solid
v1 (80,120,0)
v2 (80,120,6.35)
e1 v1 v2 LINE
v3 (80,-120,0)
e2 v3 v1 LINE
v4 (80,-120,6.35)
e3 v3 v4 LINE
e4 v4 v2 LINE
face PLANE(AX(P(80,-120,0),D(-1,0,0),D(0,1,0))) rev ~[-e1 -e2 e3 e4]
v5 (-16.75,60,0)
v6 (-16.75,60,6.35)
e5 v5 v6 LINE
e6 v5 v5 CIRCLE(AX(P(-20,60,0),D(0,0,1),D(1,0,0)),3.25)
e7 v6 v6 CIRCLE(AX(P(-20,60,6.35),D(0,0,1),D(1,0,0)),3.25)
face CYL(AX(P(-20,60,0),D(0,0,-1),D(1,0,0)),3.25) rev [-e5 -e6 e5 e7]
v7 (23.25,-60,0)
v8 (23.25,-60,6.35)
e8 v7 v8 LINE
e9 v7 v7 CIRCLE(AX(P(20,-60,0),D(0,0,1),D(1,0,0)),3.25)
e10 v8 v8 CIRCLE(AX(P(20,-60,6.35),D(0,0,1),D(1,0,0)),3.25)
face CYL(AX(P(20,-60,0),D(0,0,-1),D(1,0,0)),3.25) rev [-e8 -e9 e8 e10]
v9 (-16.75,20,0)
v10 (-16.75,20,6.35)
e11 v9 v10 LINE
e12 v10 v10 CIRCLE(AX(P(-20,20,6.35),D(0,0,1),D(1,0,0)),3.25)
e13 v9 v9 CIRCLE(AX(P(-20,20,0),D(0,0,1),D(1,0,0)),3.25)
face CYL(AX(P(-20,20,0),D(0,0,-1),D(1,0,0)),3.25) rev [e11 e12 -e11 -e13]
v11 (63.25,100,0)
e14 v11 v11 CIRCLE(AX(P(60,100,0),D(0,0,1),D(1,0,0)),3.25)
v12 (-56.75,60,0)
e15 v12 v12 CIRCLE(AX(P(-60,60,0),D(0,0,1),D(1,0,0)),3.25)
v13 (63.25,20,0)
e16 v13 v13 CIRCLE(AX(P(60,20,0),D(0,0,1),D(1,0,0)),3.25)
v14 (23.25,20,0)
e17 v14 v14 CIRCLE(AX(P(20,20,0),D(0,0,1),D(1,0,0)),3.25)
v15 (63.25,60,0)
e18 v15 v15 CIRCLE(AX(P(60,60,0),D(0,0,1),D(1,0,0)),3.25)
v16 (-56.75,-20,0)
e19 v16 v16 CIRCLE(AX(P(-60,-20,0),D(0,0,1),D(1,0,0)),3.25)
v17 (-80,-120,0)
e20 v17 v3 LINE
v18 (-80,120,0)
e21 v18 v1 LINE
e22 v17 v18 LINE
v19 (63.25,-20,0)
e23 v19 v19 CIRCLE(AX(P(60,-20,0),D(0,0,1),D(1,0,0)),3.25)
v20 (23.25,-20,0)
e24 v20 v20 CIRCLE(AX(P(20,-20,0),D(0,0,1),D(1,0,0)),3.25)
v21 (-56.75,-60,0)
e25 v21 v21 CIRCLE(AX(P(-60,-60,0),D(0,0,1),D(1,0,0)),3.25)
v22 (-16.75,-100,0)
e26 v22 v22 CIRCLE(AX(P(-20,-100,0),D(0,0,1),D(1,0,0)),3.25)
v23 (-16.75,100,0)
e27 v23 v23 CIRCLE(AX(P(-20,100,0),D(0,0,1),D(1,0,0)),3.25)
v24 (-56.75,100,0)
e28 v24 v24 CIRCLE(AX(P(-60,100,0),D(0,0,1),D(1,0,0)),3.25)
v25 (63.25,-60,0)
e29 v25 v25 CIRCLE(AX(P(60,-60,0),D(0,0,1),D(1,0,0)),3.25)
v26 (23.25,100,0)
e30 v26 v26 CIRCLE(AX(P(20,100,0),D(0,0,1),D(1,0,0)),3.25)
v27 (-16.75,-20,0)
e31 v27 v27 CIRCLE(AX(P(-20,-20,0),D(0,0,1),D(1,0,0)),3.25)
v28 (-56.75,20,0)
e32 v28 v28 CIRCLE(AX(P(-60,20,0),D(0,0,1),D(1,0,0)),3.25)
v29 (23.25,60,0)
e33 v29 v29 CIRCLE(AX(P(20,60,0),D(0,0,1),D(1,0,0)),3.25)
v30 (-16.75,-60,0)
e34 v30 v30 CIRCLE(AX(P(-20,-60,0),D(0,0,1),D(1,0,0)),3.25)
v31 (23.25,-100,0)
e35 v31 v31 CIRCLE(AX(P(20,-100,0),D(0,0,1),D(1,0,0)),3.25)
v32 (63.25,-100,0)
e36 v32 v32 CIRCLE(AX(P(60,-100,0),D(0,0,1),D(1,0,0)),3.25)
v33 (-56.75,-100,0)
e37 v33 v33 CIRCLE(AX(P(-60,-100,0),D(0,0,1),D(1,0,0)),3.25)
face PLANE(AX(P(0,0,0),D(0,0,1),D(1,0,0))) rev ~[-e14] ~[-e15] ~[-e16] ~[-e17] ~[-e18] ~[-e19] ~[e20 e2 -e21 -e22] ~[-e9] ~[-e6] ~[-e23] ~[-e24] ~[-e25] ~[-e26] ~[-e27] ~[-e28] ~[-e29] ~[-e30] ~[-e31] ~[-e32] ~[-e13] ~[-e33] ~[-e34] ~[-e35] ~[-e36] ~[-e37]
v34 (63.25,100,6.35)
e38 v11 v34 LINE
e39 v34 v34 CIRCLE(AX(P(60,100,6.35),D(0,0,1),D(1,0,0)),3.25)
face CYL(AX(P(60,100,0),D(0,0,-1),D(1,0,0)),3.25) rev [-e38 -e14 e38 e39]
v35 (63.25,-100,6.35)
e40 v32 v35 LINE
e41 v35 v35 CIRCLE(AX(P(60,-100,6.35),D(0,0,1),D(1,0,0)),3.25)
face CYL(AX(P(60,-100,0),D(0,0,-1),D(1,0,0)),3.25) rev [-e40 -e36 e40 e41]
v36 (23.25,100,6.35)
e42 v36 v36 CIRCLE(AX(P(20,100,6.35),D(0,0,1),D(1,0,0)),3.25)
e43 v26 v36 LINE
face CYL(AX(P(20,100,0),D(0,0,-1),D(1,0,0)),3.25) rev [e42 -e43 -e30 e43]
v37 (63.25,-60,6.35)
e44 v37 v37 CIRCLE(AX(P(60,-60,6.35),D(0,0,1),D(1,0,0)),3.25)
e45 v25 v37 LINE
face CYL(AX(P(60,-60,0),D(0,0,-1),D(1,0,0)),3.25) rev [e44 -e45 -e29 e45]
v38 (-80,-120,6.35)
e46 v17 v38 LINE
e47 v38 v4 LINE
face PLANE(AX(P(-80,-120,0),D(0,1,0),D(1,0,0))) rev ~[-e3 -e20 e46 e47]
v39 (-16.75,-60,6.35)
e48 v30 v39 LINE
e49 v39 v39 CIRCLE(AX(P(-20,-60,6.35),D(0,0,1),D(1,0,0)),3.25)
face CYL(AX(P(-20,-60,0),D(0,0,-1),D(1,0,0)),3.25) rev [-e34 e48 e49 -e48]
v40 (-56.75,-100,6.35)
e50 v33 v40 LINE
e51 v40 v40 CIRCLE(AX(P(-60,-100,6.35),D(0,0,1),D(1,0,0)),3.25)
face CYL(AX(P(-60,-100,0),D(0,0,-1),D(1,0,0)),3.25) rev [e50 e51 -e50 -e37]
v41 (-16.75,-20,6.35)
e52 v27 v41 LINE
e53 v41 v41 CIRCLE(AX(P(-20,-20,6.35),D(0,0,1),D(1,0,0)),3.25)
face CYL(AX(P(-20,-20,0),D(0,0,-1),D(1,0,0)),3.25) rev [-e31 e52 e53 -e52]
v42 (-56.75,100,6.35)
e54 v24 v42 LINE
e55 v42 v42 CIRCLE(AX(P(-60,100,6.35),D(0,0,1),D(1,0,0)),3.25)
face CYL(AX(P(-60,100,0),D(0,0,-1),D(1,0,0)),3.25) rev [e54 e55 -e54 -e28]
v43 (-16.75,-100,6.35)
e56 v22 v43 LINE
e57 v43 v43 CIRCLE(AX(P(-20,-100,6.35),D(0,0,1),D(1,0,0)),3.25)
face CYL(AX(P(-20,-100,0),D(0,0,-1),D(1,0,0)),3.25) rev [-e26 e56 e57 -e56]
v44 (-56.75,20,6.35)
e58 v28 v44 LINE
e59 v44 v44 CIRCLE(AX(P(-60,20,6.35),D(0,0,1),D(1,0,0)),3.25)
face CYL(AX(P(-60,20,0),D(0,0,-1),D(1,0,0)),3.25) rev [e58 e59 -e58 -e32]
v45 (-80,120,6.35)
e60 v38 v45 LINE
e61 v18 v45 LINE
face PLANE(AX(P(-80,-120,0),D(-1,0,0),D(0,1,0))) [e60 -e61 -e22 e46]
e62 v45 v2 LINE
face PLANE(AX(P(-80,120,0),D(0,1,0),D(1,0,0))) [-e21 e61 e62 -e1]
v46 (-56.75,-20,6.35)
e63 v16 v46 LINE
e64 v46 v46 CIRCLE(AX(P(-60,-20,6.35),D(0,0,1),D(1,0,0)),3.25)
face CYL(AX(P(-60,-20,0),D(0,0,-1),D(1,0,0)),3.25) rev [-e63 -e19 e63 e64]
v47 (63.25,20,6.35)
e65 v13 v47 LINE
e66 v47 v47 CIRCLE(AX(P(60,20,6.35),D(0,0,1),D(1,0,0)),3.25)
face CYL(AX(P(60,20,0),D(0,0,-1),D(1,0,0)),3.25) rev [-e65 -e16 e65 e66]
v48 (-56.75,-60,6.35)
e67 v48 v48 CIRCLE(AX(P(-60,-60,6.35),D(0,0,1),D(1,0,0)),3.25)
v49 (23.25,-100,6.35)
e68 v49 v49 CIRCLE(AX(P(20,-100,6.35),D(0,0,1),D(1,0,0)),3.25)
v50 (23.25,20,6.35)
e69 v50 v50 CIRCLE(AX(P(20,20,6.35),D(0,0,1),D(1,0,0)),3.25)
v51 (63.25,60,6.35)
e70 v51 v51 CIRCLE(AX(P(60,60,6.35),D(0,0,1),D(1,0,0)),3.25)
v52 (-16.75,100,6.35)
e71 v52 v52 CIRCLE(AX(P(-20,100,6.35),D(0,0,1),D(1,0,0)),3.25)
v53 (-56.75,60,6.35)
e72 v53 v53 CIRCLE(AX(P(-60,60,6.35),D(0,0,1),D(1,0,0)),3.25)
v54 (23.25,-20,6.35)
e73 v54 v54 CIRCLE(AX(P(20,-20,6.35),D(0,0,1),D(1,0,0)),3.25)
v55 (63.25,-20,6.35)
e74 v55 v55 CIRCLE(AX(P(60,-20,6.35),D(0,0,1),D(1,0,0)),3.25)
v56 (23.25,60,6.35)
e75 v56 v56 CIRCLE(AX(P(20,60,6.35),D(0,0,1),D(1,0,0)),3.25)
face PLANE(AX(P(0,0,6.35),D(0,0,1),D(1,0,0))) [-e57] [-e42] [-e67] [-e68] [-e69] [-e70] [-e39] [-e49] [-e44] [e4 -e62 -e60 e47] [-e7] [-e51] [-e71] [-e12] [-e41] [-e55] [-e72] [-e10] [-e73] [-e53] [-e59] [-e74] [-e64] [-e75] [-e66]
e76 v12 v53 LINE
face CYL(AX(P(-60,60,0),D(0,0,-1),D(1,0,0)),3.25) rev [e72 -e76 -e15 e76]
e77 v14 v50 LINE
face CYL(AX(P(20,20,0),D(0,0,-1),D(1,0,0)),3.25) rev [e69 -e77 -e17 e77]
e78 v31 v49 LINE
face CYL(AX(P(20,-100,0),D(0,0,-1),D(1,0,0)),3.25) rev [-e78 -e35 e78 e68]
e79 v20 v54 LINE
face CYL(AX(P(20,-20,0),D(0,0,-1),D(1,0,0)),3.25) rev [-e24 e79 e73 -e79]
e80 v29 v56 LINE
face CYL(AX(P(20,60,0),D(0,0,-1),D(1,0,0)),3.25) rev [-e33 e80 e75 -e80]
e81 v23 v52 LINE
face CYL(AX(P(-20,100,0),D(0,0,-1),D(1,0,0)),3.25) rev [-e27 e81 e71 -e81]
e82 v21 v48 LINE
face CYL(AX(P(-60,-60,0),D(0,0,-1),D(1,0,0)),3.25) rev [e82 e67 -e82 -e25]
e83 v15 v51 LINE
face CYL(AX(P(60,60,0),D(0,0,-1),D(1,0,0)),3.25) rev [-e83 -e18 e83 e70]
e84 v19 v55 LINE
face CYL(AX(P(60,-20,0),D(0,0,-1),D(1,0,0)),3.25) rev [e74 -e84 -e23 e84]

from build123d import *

# Parameters (mm, degrees)
F0_W     = 160
F0_H     = 240
F0_R     = 3.25
F1_DEPTH = 6.35


# Not quite as in the source:
# - a length typed as a fraction of an inch, garbled in the dataset ("3 / 203.2 mm" for 3/8 in), is restored


with BuildPart() as f1:
    # F0 (on Top) → F1 (new body)
    with BuildSketch(Plane.XY):
        Rectangle(F0_W, F0_H)
        with Locations((-60, -100)):
            Circle(F0_R, mode=Mode.SUBTRACT)
        with Locations((-20, -100)):
            Circle(F0_R, mode=Mode.SUBTRACT)
        with Locations((-60, -60)):
            Circle(F0_R, mode=Mode.SUBTRACT)
        with Locations((-60, -20)):
            Circle(F0_R, mode=Mode.SUBTRACT)
        with Locations((-20, -60)):
            Circle(F0_R, mode=Mode.SUBTRACT)
        with Locations((-20, -20)):
            Circle(F0_R, mode=Mode.SUBTRACT)
        with Locations((20, -100)):
            Circle(F0_R, mode=Mode.SUBTRACT)
        with Locations((60, -100)):
            Circle(F0_R, mode=Mode.SUBTRACT)
        with Locations((20, -60)):
            Circle(F0_R, mode=Mode.SUBTRACT)
        with Locations((20, -20)):
            Circle(F0_R, mode=Mode.SUBTRACT)
        with Locations((60, -60)):
            Circle(F0_R, mode=Mode.SUBTRACT)
        with Locations((60, -20)):
            Circle(F0_R, mode=Mode.SUBTRACT)
        with Locations((-60, 20)):
            Circle(F0_R, mode=Mode.SUBTRACT)
        with Locations((-20, 20)):
            Circle(F0_R, mode=Mode.SUBTRACT)
        with Locations((-60, 60)):
            Circle(F0_R, mode=Mode.SUBTRACT)
        with Locations((-60, 100)):
            Circle(F0_R, mode=Mode.SUBTRACT)
        with Locations((-20, 60)):
            Circle(F0_R, mode=Mode.SUBTRACT)
        with Locations((-20, 100)):
            Circle(F0_R, mode=Mode.SUBTRACT)
        with Locations((20, 20)):
            Circle(F0_R, mode=Mode.SUBTRACT)
        with Locations((60, 20)):
            Circle(F0_R, mode=Mode.SUBTRACT)
        with Locations((20, 60)):
            Circle(F0_R, mode=Mode.SUBTRACT)
        with Locations((20, 100)):
            Circle(F0_R, mode=Mode.SUBTRACT)
        with Locations((60, 60)):
            Circle(F0_R, mode=Mode.SUBTRACT)
        with Locations((60, 100)):
            Circle(F0_R, mode=Mode.SUBTRACT)
    extrude(amount=F1_DEPTH)


solid = f1.part
